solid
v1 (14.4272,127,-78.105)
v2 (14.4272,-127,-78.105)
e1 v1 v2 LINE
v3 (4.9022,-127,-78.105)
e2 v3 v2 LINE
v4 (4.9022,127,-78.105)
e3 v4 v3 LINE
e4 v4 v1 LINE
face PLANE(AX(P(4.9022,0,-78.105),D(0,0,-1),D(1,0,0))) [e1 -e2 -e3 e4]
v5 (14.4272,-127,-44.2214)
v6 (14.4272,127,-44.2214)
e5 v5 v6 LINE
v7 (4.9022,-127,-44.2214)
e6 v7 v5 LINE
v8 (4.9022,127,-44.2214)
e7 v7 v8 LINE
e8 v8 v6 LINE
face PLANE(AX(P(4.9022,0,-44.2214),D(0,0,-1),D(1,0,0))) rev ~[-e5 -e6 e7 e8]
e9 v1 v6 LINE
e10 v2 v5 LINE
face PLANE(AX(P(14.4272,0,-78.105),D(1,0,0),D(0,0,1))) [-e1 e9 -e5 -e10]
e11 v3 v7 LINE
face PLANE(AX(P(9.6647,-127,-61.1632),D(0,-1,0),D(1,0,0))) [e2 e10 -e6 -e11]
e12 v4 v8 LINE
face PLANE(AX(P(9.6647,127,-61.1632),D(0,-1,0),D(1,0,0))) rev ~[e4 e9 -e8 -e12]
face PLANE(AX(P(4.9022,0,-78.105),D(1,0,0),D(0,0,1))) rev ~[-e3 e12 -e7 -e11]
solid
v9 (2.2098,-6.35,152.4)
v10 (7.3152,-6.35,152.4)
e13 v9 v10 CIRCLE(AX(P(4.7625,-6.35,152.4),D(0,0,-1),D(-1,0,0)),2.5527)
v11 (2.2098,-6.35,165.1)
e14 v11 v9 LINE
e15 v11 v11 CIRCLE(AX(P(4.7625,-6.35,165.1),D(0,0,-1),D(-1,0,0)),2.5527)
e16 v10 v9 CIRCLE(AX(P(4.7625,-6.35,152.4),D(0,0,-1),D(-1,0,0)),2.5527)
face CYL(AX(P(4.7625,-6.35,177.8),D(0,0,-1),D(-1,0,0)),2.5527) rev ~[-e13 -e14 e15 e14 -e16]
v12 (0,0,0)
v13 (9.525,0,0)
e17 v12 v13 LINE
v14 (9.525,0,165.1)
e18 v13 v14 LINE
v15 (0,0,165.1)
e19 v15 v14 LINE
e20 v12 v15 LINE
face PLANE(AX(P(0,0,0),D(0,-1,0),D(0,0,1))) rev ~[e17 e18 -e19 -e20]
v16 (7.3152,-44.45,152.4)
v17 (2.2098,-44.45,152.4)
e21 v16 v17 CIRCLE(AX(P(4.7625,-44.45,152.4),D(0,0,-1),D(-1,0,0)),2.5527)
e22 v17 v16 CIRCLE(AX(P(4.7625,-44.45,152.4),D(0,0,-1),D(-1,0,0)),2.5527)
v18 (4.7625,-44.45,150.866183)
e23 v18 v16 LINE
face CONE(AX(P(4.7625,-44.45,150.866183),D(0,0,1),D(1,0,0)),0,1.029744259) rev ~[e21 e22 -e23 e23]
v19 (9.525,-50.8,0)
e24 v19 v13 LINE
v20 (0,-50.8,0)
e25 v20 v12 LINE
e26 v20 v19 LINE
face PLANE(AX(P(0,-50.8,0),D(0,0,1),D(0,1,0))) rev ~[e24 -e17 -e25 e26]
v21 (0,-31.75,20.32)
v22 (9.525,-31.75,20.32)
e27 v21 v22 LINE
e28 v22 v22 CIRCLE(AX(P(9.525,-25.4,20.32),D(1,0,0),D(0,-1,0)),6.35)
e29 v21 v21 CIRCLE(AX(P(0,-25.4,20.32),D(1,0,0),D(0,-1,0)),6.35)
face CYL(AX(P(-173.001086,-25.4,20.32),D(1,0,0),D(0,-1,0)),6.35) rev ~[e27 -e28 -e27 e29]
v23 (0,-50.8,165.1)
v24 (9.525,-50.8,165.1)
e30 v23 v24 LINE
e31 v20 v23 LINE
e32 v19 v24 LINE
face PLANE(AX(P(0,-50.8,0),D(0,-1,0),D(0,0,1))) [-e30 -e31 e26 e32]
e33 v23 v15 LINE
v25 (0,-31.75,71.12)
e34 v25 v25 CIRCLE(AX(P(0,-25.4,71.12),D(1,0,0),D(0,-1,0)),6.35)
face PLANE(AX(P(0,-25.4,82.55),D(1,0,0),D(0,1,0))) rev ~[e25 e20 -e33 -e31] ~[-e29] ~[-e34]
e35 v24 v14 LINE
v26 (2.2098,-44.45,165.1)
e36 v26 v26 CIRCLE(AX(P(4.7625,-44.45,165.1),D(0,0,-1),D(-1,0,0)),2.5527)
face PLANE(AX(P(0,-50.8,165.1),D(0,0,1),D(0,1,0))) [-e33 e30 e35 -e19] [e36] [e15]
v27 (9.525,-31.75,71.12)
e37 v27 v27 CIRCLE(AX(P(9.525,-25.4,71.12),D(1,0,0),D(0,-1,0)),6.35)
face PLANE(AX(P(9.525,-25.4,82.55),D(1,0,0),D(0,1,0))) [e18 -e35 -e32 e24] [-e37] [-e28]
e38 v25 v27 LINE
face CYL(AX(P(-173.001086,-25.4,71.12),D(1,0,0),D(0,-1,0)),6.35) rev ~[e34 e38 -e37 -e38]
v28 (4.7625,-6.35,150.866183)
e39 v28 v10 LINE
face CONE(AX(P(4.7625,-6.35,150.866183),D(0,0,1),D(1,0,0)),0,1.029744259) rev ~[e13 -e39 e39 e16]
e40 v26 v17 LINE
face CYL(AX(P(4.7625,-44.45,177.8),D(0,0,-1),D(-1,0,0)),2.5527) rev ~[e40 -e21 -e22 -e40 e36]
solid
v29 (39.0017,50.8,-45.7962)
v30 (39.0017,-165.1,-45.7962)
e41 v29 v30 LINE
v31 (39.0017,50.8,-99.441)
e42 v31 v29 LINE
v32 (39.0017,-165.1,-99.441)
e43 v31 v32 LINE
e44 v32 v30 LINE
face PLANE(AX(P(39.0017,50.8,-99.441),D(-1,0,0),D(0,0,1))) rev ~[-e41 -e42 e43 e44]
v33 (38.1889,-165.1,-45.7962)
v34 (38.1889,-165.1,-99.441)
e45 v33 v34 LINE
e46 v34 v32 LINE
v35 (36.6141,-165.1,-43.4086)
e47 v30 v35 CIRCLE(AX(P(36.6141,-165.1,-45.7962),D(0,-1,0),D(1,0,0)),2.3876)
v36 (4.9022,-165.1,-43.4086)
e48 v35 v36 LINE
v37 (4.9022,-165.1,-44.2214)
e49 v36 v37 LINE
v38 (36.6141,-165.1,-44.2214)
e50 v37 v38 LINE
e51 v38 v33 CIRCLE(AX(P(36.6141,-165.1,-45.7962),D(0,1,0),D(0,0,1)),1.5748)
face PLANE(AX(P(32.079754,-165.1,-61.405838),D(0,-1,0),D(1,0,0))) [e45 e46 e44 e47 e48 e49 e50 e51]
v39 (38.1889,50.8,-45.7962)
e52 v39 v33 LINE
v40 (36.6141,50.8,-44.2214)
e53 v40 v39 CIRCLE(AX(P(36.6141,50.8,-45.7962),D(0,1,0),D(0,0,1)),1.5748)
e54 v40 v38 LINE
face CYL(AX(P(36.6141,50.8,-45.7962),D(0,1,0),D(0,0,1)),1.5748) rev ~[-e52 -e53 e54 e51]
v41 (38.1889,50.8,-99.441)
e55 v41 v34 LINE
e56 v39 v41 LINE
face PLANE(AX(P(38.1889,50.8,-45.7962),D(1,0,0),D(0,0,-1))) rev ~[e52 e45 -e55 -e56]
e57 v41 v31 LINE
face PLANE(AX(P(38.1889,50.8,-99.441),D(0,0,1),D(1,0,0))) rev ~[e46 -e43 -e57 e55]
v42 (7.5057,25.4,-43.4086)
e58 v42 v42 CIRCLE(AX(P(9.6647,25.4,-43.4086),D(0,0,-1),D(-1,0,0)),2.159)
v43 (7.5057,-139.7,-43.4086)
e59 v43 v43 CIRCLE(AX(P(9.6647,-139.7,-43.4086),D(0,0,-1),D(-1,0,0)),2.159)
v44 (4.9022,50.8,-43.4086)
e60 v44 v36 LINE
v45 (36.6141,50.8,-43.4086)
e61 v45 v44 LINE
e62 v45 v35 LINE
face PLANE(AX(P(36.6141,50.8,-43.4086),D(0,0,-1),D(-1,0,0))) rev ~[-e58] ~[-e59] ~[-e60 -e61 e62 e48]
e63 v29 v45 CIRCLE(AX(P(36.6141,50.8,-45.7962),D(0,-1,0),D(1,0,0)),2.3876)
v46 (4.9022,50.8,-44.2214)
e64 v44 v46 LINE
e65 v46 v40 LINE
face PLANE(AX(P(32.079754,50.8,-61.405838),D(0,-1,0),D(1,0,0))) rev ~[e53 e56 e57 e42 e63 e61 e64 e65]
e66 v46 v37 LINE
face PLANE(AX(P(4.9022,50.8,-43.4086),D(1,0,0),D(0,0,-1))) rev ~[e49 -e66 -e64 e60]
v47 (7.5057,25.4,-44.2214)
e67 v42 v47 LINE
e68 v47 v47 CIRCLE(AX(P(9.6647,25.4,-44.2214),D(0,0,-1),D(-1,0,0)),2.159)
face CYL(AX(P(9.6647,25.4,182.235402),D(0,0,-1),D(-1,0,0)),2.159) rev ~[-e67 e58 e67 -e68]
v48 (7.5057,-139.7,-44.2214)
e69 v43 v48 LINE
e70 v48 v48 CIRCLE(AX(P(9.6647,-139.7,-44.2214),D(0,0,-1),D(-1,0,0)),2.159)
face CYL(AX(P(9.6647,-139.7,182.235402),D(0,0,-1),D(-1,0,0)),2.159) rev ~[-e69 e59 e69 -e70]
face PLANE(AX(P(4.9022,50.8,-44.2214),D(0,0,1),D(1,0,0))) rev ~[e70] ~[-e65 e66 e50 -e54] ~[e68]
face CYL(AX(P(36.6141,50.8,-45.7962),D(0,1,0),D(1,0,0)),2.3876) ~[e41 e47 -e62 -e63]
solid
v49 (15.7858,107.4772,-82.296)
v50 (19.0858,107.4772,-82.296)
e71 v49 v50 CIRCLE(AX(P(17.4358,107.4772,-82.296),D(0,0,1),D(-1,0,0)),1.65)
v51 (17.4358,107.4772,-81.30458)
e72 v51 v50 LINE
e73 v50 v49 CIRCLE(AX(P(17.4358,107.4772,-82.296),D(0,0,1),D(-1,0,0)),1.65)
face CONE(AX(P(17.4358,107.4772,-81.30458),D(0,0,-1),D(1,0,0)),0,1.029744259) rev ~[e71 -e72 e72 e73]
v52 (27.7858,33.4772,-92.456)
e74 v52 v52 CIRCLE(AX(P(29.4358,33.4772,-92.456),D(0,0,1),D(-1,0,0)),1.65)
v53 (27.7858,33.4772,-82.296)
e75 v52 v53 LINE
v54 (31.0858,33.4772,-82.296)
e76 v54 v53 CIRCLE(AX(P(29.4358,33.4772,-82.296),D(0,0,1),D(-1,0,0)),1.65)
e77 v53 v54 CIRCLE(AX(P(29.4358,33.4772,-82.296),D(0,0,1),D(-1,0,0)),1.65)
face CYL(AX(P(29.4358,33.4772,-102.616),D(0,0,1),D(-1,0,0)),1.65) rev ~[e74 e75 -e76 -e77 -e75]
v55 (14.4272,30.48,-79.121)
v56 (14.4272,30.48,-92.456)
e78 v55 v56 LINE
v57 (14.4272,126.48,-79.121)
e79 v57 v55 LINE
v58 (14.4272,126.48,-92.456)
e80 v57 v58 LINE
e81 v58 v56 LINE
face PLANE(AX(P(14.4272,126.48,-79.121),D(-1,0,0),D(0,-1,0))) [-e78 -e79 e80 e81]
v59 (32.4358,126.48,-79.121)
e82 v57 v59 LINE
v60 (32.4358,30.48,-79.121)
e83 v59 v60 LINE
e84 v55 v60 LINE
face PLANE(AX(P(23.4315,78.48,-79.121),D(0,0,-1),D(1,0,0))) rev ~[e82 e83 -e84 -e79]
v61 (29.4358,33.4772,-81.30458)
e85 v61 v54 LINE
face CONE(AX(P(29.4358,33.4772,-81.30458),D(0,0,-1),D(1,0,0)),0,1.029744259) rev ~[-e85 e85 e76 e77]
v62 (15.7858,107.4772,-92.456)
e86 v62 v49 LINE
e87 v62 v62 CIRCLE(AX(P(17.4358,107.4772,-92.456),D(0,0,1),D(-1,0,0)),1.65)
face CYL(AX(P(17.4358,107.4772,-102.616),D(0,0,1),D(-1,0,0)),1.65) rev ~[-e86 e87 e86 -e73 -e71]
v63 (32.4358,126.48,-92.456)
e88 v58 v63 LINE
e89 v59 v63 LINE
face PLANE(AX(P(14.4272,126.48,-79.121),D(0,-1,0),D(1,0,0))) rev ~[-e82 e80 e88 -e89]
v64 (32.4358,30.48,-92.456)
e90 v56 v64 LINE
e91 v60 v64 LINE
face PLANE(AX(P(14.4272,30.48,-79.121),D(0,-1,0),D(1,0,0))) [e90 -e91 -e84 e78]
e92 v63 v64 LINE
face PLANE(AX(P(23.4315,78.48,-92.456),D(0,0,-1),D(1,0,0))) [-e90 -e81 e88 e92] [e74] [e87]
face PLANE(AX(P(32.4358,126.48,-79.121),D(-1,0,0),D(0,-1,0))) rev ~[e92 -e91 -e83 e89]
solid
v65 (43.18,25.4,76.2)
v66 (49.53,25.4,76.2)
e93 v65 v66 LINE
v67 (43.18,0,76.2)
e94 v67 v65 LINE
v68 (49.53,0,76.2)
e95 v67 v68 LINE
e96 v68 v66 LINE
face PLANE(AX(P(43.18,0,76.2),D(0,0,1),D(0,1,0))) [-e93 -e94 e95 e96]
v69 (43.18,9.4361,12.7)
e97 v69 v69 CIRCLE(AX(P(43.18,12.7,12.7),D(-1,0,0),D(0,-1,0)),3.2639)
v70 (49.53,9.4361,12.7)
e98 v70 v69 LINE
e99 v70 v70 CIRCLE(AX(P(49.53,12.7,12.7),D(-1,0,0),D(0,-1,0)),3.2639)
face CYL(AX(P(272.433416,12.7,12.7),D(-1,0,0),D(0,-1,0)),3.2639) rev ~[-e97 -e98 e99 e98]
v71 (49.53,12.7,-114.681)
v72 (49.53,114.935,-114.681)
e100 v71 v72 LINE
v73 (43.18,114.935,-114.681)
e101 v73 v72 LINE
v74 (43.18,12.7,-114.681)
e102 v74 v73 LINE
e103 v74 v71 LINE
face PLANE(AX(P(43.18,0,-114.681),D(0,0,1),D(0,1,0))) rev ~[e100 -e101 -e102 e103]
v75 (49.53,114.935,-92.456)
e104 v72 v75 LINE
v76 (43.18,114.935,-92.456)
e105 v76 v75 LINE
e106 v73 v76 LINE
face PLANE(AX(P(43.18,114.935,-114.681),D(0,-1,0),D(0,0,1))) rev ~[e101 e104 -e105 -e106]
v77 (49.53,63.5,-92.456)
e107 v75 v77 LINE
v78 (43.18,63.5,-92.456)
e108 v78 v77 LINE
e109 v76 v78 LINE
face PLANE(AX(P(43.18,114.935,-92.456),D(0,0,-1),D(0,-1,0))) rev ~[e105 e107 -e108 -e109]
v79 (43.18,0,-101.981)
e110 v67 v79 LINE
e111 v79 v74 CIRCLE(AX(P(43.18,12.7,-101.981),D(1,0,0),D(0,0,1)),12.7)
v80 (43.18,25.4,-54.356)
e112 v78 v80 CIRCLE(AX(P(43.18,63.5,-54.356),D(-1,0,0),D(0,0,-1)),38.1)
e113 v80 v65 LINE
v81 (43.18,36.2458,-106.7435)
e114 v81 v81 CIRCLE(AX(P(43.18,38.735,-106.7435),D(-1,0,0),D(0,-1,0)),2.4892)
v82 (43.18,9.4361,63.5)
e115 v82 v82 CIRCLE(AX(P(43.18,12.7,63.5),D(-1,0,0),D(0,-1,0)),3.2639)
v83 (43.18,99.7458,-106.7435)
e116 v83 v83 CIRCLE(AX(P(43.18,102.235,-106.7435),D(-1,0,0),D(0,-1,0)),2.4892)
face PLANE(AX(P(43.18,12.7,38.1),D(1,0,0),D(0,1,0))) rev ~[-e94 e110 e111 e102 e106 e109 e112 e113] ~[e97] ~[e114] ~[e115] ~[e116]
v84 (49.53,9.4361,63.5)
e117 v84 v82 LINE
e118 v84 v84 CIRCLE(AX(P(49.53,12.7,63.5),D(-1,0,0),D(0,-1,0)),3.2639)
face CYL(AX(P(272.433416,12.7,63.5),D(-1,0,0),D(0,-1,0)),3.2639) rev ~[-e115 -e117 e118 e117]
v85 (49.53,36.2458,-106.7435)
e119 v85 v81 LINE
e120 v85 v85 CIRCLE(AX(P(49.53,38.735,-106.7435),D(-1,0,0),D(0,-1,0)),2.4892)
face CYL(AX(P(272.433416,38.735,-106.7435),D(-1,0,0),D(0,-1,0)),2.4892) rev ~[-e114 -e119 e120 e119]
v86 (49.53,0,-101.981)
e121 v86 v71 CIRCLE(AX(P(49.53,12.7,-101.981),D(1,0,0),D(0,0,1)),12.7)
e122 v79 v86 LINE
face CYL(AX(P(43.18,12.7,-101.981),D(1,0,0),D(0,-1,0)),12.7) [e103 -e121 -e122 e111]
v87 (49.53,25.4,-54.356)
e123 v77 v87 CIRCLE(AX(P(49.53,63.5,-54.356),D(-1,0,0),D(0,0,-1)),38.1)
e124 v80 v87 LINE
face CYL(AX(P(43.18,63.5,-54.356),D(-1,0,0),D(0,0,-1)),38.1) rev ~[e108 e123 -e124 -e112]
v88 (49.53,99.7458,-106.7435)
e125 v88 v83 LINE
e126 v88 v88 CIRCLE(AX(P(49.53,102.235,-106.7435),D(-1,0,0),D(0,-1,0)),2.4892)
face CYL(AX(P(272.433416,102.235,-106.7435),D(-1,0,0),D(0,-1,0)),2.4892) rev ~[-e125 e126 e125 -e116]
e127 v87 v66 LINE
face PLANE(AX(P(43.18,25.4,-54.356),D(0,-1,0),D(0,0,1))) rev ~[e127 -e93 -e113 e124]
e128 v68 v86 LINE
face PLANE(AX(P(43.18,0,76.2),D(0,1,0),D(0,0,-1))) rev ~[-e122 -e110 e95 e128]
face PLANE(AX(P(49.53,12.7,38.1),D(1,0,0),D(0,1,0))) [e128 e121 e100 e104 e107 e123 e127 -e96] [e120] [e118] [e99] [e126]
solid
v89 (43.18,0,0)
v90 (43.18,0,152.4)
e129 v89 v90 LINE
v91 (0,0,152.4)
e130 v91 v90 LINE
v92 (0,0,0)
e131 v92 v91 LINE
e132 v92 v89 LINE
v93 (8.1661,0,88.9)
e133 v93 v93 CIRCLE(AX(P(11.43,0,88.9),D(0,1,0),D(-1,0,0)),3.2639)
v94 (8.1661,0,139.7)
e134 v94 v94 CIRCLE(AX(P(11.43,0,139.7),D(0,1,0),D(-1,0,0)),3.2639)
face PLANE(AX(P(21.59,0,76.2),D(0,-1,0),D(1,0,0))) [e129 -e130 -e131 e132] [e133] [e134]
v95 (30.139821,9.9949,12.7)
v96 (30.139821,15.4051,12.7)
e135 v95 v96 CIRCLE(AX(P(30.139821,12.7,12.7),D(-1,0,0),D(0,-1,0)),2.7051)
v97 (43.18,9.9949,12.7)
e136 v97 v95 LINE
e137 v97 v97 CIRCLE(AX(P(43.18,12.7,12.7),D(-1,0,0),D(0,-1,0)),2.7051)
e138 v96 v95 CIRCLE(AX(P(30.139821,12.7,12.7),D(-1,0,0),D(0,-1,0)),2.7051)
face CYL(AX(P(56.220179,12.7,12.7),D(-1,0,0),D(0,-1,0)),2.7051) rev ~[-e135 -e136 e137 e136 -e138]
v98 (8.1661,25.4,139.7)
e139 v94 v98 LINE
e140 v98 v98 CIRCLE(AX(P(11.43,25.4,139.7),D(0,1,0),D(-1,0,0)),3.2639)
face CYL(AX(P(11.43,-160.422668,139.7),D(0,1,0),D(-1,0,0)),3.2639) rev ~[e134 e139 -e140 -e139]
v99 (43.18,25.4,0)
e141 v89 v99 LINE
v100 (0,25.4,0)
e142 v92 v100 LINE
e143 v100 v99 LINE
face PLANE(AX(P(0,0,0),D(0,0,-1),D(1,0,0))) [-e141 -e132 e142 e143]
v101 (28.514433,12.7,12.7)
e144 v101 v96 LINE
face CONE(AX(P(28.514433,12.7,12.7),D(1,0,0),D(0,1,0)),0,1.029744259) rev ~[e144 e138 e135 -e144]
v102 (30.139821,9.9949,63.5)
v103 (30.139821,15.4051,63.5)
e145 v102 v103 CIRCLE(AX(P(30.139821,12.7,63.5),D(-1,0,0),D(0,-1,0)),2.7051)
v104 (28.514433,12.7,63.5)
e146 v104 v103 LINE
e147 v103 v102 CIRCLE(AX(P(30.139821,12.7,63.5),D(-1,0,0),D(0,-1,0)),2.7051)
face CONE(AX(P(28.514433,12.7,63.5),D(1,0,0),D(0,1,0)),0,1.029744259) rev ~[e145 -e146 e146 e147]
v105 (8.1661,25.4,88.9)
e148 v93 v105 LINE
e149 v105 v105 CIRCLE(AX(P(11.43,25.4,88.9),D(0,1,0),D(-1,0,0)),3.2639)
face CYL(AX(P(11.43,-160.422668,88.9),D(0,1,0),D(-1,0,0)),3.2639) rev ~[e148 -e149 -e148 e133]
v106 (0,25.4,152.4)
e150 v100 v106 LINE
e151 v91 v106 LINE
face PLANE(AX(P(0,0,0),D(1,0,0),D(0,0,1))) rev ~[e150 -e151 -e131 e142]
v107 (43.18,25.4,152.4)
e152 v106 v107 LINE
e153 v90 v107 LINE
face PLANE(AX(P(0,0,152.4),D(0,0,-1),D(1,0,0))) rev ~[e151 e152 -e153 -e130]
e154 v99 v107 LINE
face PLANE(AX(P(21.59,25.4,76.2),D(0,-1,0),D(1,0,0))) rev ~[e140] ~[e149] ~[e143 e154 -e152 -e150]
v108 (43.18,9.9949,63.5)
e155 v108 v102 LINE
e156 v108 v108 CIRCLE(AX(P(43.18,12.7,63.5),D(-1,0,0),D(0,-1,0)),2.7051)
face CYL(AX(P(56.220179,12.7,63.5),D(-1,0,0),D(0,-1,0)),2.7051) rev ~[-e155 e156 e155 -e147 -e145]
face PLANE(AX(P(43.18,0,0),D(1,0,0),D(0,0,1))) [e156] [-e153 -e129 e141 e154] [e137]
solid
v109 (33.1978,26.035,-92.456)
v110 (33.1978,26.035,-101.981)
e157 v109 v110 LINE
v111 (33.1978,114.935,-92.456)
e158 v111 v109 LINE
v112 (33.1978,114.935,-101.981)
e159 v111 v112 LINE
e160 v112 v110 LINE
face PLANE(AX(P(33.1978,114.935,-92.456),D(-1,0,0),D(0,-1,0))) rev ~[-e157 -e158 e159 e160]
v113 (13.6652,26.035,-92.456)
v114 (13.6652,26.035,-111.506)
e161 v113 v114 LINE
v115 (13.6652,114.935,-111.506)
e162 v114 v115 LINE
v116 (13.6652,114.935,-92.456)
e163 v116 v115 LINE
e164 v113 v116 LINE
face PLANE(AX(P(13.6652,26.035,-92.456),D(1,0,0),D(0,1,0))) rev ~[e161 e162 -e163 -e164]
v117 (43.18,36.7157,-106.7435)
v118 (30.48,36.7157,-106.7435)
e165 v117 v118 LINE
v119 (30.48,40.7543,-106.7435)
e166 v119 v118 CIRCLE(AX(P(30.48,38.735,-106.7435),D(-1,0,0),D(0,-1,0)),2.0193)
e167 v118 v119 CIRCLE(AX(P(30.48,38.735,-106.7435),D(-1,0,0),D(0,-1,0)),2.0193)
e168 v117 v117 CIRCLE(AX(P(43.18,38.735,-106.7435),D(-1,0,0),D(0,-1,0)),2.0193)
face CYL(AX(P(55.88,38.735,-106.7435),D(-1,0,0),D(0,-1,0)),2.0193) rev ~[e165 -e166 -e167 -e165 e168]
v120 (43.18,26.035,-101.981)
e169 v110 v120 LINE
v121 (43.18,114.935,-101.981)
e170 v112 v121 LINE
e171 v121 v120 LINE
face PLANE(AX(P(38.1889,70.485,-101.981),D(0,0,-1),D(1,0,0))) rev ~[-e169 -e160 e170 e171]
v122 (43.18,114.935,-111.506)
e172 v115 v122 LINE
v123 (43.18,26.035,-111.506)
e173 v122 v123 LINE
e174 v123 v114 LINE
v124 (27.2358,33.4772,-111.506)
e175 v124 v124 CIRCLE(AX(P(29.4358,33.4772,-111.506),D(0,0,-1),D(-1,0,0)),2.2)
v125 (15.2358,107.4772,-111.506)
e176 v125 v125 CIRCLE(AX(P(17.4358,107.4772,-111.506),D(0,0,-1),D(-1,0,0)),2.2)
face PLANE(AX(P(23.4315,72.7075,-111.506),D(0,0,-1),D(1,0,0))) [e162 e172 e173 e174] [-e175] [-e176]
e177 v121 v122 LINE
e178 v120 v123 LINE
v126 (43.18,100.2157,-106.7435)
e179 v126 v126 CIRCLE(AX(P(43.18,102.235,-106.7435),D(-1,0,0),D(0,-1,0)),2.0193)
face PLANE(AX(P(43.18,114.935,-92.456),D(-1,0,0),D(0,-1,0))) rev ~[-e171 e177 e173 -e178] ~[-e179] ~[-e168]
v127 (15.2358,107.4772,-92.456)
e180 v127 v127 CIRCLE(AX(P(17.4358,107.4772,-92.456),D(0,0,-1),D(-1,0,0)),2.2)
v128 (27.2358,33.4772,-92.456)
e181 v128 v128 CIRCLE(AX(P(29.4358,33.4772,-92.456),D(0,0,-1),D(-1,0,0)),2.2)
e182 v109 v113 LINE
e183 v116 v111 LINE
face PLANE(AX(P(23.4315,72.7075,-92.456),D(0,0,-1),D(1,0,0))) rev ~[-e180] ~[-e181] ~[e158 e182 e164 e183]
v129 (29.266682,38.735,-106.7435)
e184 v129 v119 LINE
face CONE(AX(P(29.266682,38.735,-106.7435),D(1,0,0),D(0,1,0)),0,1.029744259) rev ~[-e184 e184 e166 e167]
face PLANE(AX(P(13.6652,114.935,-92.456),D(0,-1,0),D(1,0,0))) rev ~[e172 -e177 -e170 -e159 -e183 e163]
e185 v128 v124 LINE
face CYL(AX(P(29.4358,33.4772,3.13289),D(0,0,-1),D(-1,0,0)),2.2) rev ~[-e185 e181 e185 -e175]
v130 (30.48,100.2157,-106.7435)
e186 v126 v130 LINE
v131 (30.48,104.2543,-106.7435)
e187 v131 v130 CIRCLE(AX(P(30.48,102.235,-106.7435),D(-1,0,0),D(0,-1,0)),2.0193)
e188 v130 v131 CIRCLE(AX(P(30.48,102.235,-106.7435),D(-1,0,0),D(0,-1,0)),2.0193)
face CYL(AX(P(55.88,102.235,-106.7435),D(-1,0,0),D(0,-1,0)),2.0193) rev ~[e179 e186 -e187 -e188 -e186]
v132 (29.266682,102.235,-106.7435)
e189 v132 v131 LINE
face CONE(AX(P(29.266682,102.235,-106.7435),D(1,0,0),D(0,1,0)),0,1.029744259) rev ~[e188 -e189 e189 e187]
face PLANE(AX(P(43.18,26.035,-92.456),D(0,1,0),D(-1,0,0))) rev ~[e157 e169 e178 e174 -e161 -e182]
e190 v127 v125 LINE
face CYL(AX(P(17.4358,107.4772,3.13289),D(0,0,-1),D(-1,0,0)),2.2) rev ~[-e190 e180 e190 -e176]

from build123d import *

# Parameters (mm, degrees)
F0_W      = 43.18
F0_H      = 152.4
F1_DEPTH  = 25.4
F2_D      = 6.5278
F3_W      = 50.8
F3_H      = 165.1
F4_DEPTH  = 9.525
F5_D      = 12.7
F7_D      = 5.1054
F7_DEPTH  = 12.7
F7_TIP    = 1.5338169022
F8_W      = 9.525
F8_H      = 33.8836
F9_DEPTH  = 127
F11_W     = 18.0086
F11_H     = 96
F12_DEPTH = 13.335
F14_D     = 3.3
F14_DEPTH = 10.16
F14_TIP   = 0.9914200214
F15_W     = 18.0086
F15_H     = 84.455
F15_R     = 1.65
F15_H_2   = 4.445
F15_W_2   = 9.9822
F15_H_3   = 88.9
F16_DEPTH = 19.05
F17_DEPTH = 9.525
F18_D     = 4.4
F20_D     = 4.0386
F20_DEPTH = 12.7
F20_TIP   = 1.213317848
F22_D     = 5.4102
F22_DEPTH = 13.0401785714
F22_TIP   = 1.6253880605
F23_W     = 25.4
F23_H     = 76.2
F23_R     = 2.7051
F23_W_2   = 88.9
F23_H_2   = 9.525
F24_DEPTH = 6.35
F26_D     = 6.5278
F27_D     = 4.9784
F28_R     = 12.7
F31_DEPTH = 215.9
F33_D     = 4.318


with BuildPart() as f1:
    # F0 (on Front) → F1 (new body)
    with BuildSketch(Plane.XZ):
        with Locations((21.59, 76.2)):
            Rectangle(F0_W, F0_H)
    extrude(amount=-F1_DEPTH)

    # F2 (through all)
    with Locations(Plane.XZ):
        with Locations((11.43, 139.7), (11.43, 88.9)):
            Hole(F2_D / 2)

    # F22
    with Locations(Plane.YZ.offset(43.18)):
        with Locations((12.7, 63.5), (12.7, 12.7)):
            Hole(F22_D / 2, depth=F22_DEPTH)
            with Locations((0, 0, -(F22_DEPTH + F22_TIP / 2))):  # 118° drill point
                Cone(0, F22_D / 2, F22_TIP, mode=Mode.SUBTRACT)


with BuildPart() as f4:
    # F3 (on Right) → F4 (new body)
    with BuildSketch(Plane.YZ):
        with Locations((-25.4, 82.55)):
            Rectangle(F3_W, F3_H)
    extrude(amount=F4_DEPTH)

    # F5 (through all)
    with Locations(Plane(origin=(0, 0, 0), x_dir=(0, 1, 0), z_dir=(-1, 0, 0))):
        with Locations((-25.4, -71.12), (-25.4, -20.32)):
            Hole(F5_D / 2)

    # F7
    with Locations(Plane.XY.offset(165.1)):
        with Locations((4.7625, -6.35), (4.7625, -44.45)):
            Hole(F7_D / 2, depth=F7_DEPTH)
            with Locations((0, 0, -(F7_DEPTH + F7_TIP / 2))):  # 118° drill point
                Cone(0, F7_D / 2, F7_TIP, mode=Mode.SUBTRACT)


with BuildPart() as f9:
    # F8 (on Front) → F9 (new body, symmetric)
    with BuildSketch(Plane.XZ):
        with Locations((9.6647, -61.1632)):
            Rectangle(F8_W, F8_H)
    extrude(amount=F9_DEPTH, both=True)


with BuildPart() as f12:
    # F11 (on offset) → F12 (new body)
    with BuildSketch(Plane(origin=(0, 0, -79.121), x_dir=(1, 0, 0), z_dir=(0, 0, -1))):
        with Locations((23.4315, -78.48)):
            Rectangle(F11_W, F11_H)
    extrude(amount=F12_DEPTH)

    # F14
    with Locations(Plane(origin=(0, 0, -92.456), x_dir=(1, 0, 0), z_dir=(0, 0, -1))):
        with Locations((29.4358, -33.4772), (17.4358, -107.4772)):
            Hole(F14_D / 2, depth=F14_DEPTH)
            with Locations((0, 0, -(F14_DEPTH + F14_TIP / 2))):  # 118° drill point
                Cone(0, F14_D / 2, F14_TIP, mode=Mode.SUBTRACT)


with BuildPart() as f16:
    # F15 (on face) → F16 (new body)
    with BuildSketch(Plane(origin=(0, 0, -92.456), x_dir=(1, 0, 0), z_dir=(0, 0, -1))):
        with Locations((23.4315, -72.7075)):
            Rectangle(F15_W, F15_H)
        with Locations((17.4358, -107.4772)):
            Circle(F15_R, mode=Mode.SUBTRACT)
        with Locations((29.4358, -33.4772)):
            Circle(F15_R, mode=Mode.SUBTRACT)
        with Locations((23.4315, -28.2575)):
            Rectangle(F15_W, F15_H_2)
        with Locations((38.1889, -70.485)):
            Rectangle(F15_W_2, F15_H_3)
        Polygon((14.4272, -30.48), (14.4272, -26.035), (13.6652, -26.035), (13.6652, -114.935), (14.4272, -114.935), align=None)
        Polygon((33.1978, -26.035), (32.4358, -26.035), (32.4358, -30.48), (32.4358, -114.935), (33.1978, -114.935), align=None)
    extrude(amount=F16_DEPTH)

    # F15 (on face) → F17 (cut)
    with BuildSketch(Plane(origin=(0, 0, -92.456), x_dir=(1, 0, 0), z_dir=(0, 0, -1))):
        with Locations((38.1889, -70.485)):
            Rectangle(F15_W_2, F15_H_3)
    extrude(amount=F17_DEPTH, mode=Mode.SUBTRACT)

    # F18 (through all)
    with Locations(Plane.XY.offset(-92.456)):
        with Locations((29.4358, 33.4772), (17.4358, 107.4772)):
            Hole(F18_D / 2)

    # F20
    with Locations(Plane.YZ.offset(43.18)):
        with Locations((38.735, -106.7435), (102.235, -106.7435)):
            Hole(F20_D / 2, depth=F20_DEPTH)
            with Locations((0, 0, -(F20_DEPTH + F20_TIP / 2))):  # 118° drill point
                Cone(0, F20_D / 2, F20_TIP, mode=Mode.SUBTRACT)


with BuildPart() as f24:
    # F23 (on face) → F24 (new body)
    with BuildSketch(Plane.YZ.offset(43.18)):
        with Locations((12.7, 38.1)):
            Rectangle(F23_W, F23_H)
        with Locations((12.7, 12.7)):
            Circle(F23_R, mode=Mode.SUBTRACT)
        with Locations((12.7, 63.5)):
            Circle(F23_R, mode=Mode.SUBTRACT)
        Polygon((26.035, -111.506), (26.035, -101.981), (25.4, -101.981), (25.4, -92.456), (25.4, -54.3559999772), (25.4, 0), (0, 0), (0, -111.506), align=None)
        Polygon((26.035, -101.981), (114.935, -101.981), (114.935, -92.456), (63.5, -92.456), (25.4, -92.456), (25.4, -101.981), align=None)
        with Locations((70.485, -106.7435)):
            Rectangle(F23_W_2, F23_H_2)
        with BuildLine():
            Line((25.4, -92.456), (63.5, -92.456))
            ThreePointArc((63.5, -92.456), (36.5592316287, -81.2967683551), (25.4, -54.3559999772))
            Line((25.4, -54.3559999772), (25.4, -92.456))
        make_face()
        Polygon((114.935, -114.681), (114.935, -111.506), (26.035, -111.506), (0, -111.506), (0, -114.681), align=None)
    extrude(amount=F24_DEPTH)

    # F26 (through all)
    with Locations(Plane.YZ.offset(49.53)):
        with Locations((12.7, 63.5), (12.7, 12.7)):
            Hole(F26_D / 2)

    # F27 (through all)
    with Locations(Plane.YZ.offset(49.53)):
        with Locations((38.735, -106.7435), (102.235, -106.7435)):
            Hole(F27_D / 2)

    # F28
    f28_edges = [f24.edges().sort_by_distance(p)[0] for p in [
        (46.355, 0, -114.681),
    ]]
    fillet(f28_edges, radius=F28_R)


with BuildPart() as f31:
    # F30 (on offset) → F31 (new body)
    with BuildSketch(Plane.XZ.offset(-50.8)):
        with BuildLine():
            Line((4.9022, -43.4086), (4.9022, -44.2214))
            Line((4.9022, -44.2214), (14.4272, -44.2214))
            Line((14.4272, -44.2214), (36.6141, -44.2214))
            ThreePointArc((36.6141, -44.2214), (37.727651759, -44.682648241), (38.1889, -45.7962))
            Line((38.1889, -45.7962), (38.1889, -99.441))
            Line((38.1889, -99.441), (39.0017, -99.441))
            Line((39.0017, -99.441), (39.0017, -45.7962))
            ThreePointArc((39.0017, -45.7962), (38.3023881508, -44.1079118492), (36.6141, -43.4086))
            Line((36.6141, -43.4086), (4.9022, -43.4086))
        make_face()
    extrude(amount=F31_DEPTH)

    # F33 (through all)
    with Locations(Plane.XY.offset(-43.4086)):
        with Locations((9.6647, -139.7), (9.6647, 25.4)):
            Hole(F33_D / 2)


solid = Compound([f1.part, f4.part, f9.part, f12.part, f16.part, f24.part, f31.part])
